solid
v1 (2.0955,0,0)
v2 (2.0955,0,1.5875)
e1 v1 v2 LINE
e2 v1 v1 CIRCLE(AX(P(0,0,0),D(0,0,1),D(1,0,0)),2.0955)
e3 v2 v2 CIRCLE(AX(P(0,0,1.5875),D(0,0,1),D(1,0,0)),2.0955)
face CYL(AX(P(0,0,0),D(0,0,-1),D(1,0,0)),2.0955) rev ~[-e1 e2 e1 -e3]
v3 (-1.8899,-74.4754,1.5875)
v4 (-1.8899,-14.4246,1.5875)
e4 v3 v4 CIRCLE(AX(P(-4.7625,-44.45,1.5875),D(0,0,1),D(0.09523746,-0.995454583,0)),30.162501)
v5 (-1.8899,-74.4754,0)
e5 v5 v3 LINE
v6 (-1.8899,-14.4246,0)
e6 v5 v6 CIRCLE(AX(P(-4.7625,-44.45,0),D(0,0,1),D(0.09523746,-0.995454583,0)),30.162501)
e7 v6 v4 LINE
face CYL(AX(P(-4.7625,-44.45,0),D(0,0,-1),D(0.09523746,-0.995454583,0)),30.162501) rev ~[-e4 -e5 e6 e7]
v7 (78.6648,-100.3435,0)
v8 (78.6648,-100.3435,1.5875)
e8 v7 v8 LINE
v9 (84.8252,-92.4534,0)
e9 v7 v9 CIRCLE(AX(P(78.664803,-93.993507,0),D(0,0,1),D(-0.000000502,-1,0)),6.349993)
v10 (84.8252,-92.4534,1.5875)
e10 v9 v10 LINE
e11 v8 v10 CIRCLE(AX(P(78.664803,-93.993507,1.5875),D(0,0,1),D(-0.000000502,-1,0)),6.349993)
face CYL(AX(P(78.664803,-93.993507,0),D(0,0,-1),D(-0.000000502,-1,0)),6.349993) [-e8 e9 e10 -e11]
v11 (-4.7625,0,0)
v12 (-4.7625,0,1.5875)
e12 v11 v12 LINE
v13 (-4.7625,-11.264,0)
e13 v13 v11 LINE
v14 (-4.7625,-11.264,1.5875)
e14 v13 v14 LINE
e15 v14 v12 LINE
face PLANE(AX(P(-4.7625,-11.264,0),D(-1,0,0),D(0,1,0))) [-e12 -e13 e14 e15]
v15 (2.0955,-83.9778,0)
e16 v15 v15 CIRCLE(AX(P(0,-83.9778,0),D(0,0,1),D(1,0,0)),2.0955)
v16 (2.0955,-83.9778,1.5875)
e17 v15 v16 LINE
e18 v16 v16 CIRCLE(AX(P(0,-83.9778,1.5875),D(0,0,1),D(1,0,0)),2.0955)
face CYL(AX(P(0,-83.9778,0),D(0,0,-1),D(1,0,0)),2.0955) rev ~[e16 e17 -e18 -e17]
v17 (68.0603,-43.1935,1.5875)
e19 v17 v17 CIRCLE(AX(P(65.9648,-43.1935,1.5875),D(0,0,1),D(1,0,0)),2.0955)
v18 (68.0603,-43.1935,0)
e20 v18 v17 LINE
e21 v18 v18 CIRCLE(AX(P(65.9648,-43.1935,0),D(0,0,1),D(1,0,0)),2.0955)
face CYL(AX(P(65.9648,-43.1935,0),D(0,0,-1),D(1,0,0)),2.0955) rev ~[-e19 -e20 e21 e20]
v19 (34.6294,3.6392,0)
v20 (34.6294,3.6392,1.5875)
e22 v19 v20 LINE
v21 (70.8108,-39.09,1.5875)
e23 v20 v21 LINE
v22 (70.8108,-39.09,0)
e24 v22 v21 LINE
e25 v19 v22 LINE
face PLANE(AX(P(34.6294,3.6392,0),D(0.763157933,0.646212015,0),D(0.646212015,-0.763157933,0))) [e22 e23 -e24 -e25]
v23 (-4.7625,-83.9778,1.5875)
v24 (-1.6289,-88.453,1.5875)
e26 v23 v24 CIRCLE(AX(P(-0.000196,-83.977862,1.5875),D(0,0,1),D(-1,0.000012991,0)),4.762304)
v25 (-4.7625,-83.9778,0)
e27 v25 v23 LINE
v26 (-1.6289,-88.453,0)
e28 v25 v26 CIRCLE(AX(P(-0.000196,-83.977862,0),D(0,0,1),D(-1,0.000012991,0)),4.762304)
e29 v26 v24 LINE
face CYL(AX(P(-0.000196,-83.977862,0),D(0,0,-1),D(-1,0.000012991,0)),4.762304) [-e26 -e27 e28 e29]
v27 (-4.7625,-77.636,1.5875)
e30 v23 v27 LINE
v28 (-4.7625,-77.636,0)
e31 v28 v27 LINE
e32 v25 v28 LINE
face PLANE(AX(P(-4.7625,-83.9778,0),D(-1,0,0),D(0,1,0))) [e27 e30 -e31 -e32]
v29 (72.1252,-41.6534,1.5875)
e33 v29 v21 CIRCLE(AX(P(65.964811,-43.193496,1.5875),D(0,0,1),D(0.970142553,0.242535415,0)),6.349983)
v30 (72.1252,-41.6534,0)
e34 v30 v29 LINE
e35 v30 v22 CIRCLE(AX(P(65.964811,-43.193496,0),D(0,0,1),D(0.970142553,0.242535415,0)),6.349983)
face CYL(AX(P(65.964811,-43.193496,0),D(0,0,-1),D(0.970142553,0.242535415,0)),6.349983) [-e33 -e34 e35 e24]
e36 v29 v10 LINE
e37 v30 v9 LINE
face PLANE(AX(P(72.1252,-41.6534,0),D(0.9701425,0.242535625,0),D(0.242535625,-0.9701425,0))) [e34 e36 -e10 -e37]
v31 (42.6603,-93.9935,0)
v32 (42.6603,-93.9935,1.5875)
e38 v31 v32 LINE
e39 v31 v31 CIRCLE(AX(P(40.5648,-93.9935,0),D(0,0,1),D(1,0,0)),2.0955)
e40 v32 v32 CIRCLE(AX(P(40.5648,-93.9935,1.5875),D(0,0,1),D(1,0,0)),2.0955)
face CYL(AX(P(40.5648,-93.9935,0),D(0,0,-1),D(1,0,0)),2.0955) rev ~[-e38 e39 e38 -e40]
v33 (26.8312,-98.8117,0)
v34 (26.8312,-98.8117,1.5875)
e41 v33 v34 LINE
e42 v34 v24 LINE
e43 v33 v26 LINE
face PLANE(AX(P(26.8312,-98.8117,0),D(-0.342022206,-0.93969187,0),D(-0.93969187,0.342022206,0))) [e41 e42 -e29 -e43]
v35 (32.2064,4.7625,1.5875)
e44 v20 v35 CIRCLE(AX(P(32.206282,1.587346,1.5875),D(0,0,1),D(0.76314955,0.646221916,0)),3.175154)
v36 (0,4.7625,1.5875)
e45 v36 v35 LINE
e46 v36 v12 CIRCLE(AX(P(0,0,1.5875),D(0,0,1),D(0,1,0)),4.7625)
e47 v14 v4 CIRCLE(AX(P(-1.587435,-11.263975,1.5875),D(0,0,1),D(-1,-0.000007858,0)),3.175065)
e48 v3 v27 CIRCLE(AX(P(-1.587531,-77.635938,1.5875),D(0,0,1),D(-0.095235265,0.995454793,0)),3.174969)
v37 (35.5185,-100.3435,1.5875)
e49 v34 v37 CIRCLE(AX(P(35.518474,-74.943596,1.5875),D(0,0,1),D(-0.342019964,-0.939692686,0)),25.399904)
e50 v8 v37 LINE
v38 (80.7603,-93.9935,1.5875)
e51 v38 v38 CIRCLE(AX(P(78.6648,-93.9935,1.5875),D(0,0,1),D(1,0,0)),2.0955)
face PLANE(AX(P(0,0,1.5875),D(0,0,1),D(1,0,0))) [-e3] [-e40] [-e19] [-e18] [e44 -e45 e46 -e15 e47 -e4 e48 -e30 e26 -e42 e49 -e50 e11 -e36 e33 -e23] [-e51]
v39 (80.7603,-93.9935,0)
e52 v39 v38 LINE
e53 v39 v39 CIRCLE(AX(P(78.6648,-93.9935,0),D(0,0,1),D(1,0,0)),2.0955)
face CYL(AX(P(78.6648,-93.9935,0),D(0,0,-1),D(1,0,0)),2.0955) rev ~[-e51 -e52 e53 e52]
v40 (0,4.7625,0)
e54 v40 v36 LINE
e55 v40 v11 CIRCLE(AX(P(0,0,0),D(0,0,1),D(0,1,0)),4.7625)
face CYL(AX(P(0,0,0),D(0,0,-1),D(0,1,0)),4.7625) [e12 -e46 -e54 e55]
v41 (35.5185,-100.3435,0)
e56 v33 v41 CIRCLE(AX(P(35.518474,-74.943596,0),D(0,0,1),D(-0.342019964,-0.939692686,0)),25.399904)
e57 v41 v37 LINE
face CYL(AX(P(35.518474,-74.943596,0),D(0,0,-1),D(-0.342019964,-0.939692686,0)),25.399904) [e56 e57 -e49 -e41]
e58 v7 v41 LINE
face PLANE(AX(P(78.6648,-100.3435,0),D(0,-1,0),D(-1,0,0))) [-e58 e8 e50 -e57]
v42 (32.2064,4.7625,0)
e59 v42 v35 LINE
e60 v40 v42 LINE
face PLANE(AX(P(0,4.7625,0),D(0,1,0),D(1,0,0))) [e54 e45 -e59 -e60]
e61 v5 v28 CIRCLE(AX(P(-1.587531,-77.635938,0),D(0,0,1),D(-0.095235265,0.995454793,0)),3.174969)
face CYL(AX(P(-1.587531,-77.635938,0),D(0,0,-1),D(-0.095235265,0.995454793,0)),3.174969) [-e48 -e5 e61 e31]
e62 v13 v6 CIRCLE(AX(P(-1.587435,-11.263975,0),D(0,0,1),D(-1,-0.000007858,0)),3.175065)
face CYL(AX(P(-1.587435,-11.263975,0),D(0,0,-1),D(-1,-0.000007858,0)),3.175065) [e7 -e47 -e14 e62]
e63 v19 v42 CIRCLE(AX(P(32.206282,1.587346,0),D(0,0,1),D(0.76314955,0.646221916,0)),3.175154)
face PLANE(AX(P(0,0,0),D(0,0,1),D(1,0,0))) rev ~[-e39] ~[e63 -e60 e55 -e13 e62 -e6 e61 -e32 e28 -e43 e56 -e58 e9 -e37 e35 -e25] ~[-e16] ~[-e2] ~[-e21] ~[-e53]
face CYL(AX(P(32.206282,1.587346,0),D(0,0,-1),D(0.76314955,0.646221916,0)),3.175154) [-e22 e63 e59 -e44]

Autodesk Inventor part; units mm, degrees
ref_plane "YZ Plane" through (0, 0, 0) normal (1, 0, 0) x (0, 1, 0)
ref_plane "XZ Plane" through (0, 0, 0) normal (0, 1, 0) x (-1, 0, 0)
ref_plane "XY Plane" through (0, 0, 0) normal (0, 0, 1) x (1, 0, 0)
sketch "main" plane through (0, 0, 0) normal (0, 0, 1) x (1, 0, 0)
  line L0 (57.2021, -70.0851) -> (14.0558, -70.0851)
  line L1 (5.3685, -68.5533) -> (-23.0916, -58.1947)
  line L2 (-26.2252, -53.7194) -> (-26.2252, -47.3776)
  arc A0 (-23.3526, -44.217) -> (-23.3526, 15.8337) centre (-26.2252, -14.1917) ccw
  line L3 (-26.2252, 18.9943) -> (-26.2252, 30.2583)
  line L4 (-21.4627, 35.0208) -> (10.7437, 35.0208)
  line L5 (13.1667, 33.8976) -> (49.3481, -8.8317)
  arc A1 (-21.4627, 35.0208) -> (-26.2252, 30.2583) centre (-21.4627, 30.2583) ccw
  circle A2 centre (-21.4627, 30.2583) radius 2.0955
  arc A3 (-26.2252, 18.9943) -> (-23.3526, 15.8337) centre (-23.0502, 18.9943) ccw
  arc A4 (-23.3526, -44.217) -> (-26.2252, -47.3776) centre (-23.0502, -47.3776) ccw
  arc A5 (-26.2252, -53.7194) -> (-23.0916, -58.1947) centre (-21.4627, -53.7194) ccw
  circle A6 centre (-21.4627, -53.7194) radius 2.0955
  arc A7 (13.1667, 33.8976) -> (10.7437, 35.0208) centre (10.7437, 31.8458) ccw
  circle A8 centre (57.2021, -63.7351) radius 2.0955
  arc A9 (50.6625, -11.395) -> (49.3481, -8.8317) centre (44.5021, -12.9351) ccw
  circle A10 centre (44.5021, -12.9351) radius 2.0955
  line L6 (50.6625, -11.395) -> (63.3625, -62.195)
  arc A11 (57.2021, -70.0851) -> (63.3625, -62.195) centre (57.2021, -63.7351) ccw
  circle A12 centre (19.1021, -63.7351) radius 2.0955
  arc A13 (5.3685, -68.5533) -> (14.0558, -70.0851) centre (14.0558, -44.6851) ccw
  point P0 (-12.3105, 3.8443)
  point P1 (9.5771, -70.0851)
  point P2 (-26.2252, -57.0542)
  point P3 (-26.2252, -44.3542)
  point P4 (-26.2252, 15.9708)
  point P5 (-26.2252, 35.0208)
  point P6 (20.6896, -70.0851)
  dimension "d14" = 38.1
  dimension "d15" = 160
  dimension "d16" = 12.7
  dimension "d17" = 19.05
  dimension "d18" = 4.7625
  dimension "d19" = 4.191
  dimension "d20" = 3.175
  dimension "d21" = 4.7625
  dimension "d22" = 4.191
  dimension "d23" = 4.191
  dimension "d24" = 4.191
  dimension "d25" = 4.191
  dimension "d26" = 25.4
sketch "Sketch1" plane through (0, 0, 0) normal (0, 0, 1) x (1, 0, 0)
  line L0 (78.6648, -100.3435) -> (35.5185, -100.3435)
  line L1 (26.8312, -98.8117) -> (-1.6289, -88.453)
  line L2 (-4.7625, -83.9778) -> (-4.7625, -77.636)
  arc A0 (-1.8899, -74.4754) -> (-1.8899, -14.4246) centre (-4.7625, -44.45) ccw
  line L3 (-4.7625, -11.264) -> (-4.7625, 0)
  line L4 (0, 4.7625) -> (32.2064, 4.7625)
  line L5 (34.6294, 3.6392) -> (70.8108, -39.09)
  arc A1 (0, 4.7625) -> (-4.7625, 0) centre (0, 0) ccw
  circle A2 centre (0, 0) radius 2.0955
  arc A3 (-4.7625, -11.264) -> (-1.8899, -14.4246) centre (-1.5875, -11.264) ccw
  arc A4 (-1.8899, -74.4754) -> (-4.7625, -77.636) centre (-1.5875, -77.636) ccw
  arc A5 (-4.7625, -83.9778) -> (-1.6289, -88.453) centre (0, -83.9778) ccw
  circle A6 centre (0, -83.9778) radius 2.0955
  arc A7 (34.6294, 3.6392) -> (32.2064, 4.7625) centre (32.2064, 1.5875) ccw
  circle A8 centre (78.6648, -93.9935) radius 2.0955
  arc A9 (72.1252, -41.6534) -> (70.8108, -39.09) centre (65.9648, -43.1935) ccw
  circle A10 centre (65.9648, -43.1935) radius 2.0955
  line L6 (72.1252, -41.6534) -> (84.8252, -92.4534)
  arc A11 (78.6648, -100.3435) -> (84.8252, -92.4534) centre (78.6648, -93.9935) ccw
  circle A12 centre (40.5648, -93.9935) radius 2.0955
  arc A13 (26.8312, -98.8117) -> (35.5185, -100.3435) centre (35.5185, -74.9435) ccw
extrude "Extrusion1" add sketch "Sketch1" along normal blind 1.5875
properties part number "hang_gusset" material "Acetal Resin, White"
